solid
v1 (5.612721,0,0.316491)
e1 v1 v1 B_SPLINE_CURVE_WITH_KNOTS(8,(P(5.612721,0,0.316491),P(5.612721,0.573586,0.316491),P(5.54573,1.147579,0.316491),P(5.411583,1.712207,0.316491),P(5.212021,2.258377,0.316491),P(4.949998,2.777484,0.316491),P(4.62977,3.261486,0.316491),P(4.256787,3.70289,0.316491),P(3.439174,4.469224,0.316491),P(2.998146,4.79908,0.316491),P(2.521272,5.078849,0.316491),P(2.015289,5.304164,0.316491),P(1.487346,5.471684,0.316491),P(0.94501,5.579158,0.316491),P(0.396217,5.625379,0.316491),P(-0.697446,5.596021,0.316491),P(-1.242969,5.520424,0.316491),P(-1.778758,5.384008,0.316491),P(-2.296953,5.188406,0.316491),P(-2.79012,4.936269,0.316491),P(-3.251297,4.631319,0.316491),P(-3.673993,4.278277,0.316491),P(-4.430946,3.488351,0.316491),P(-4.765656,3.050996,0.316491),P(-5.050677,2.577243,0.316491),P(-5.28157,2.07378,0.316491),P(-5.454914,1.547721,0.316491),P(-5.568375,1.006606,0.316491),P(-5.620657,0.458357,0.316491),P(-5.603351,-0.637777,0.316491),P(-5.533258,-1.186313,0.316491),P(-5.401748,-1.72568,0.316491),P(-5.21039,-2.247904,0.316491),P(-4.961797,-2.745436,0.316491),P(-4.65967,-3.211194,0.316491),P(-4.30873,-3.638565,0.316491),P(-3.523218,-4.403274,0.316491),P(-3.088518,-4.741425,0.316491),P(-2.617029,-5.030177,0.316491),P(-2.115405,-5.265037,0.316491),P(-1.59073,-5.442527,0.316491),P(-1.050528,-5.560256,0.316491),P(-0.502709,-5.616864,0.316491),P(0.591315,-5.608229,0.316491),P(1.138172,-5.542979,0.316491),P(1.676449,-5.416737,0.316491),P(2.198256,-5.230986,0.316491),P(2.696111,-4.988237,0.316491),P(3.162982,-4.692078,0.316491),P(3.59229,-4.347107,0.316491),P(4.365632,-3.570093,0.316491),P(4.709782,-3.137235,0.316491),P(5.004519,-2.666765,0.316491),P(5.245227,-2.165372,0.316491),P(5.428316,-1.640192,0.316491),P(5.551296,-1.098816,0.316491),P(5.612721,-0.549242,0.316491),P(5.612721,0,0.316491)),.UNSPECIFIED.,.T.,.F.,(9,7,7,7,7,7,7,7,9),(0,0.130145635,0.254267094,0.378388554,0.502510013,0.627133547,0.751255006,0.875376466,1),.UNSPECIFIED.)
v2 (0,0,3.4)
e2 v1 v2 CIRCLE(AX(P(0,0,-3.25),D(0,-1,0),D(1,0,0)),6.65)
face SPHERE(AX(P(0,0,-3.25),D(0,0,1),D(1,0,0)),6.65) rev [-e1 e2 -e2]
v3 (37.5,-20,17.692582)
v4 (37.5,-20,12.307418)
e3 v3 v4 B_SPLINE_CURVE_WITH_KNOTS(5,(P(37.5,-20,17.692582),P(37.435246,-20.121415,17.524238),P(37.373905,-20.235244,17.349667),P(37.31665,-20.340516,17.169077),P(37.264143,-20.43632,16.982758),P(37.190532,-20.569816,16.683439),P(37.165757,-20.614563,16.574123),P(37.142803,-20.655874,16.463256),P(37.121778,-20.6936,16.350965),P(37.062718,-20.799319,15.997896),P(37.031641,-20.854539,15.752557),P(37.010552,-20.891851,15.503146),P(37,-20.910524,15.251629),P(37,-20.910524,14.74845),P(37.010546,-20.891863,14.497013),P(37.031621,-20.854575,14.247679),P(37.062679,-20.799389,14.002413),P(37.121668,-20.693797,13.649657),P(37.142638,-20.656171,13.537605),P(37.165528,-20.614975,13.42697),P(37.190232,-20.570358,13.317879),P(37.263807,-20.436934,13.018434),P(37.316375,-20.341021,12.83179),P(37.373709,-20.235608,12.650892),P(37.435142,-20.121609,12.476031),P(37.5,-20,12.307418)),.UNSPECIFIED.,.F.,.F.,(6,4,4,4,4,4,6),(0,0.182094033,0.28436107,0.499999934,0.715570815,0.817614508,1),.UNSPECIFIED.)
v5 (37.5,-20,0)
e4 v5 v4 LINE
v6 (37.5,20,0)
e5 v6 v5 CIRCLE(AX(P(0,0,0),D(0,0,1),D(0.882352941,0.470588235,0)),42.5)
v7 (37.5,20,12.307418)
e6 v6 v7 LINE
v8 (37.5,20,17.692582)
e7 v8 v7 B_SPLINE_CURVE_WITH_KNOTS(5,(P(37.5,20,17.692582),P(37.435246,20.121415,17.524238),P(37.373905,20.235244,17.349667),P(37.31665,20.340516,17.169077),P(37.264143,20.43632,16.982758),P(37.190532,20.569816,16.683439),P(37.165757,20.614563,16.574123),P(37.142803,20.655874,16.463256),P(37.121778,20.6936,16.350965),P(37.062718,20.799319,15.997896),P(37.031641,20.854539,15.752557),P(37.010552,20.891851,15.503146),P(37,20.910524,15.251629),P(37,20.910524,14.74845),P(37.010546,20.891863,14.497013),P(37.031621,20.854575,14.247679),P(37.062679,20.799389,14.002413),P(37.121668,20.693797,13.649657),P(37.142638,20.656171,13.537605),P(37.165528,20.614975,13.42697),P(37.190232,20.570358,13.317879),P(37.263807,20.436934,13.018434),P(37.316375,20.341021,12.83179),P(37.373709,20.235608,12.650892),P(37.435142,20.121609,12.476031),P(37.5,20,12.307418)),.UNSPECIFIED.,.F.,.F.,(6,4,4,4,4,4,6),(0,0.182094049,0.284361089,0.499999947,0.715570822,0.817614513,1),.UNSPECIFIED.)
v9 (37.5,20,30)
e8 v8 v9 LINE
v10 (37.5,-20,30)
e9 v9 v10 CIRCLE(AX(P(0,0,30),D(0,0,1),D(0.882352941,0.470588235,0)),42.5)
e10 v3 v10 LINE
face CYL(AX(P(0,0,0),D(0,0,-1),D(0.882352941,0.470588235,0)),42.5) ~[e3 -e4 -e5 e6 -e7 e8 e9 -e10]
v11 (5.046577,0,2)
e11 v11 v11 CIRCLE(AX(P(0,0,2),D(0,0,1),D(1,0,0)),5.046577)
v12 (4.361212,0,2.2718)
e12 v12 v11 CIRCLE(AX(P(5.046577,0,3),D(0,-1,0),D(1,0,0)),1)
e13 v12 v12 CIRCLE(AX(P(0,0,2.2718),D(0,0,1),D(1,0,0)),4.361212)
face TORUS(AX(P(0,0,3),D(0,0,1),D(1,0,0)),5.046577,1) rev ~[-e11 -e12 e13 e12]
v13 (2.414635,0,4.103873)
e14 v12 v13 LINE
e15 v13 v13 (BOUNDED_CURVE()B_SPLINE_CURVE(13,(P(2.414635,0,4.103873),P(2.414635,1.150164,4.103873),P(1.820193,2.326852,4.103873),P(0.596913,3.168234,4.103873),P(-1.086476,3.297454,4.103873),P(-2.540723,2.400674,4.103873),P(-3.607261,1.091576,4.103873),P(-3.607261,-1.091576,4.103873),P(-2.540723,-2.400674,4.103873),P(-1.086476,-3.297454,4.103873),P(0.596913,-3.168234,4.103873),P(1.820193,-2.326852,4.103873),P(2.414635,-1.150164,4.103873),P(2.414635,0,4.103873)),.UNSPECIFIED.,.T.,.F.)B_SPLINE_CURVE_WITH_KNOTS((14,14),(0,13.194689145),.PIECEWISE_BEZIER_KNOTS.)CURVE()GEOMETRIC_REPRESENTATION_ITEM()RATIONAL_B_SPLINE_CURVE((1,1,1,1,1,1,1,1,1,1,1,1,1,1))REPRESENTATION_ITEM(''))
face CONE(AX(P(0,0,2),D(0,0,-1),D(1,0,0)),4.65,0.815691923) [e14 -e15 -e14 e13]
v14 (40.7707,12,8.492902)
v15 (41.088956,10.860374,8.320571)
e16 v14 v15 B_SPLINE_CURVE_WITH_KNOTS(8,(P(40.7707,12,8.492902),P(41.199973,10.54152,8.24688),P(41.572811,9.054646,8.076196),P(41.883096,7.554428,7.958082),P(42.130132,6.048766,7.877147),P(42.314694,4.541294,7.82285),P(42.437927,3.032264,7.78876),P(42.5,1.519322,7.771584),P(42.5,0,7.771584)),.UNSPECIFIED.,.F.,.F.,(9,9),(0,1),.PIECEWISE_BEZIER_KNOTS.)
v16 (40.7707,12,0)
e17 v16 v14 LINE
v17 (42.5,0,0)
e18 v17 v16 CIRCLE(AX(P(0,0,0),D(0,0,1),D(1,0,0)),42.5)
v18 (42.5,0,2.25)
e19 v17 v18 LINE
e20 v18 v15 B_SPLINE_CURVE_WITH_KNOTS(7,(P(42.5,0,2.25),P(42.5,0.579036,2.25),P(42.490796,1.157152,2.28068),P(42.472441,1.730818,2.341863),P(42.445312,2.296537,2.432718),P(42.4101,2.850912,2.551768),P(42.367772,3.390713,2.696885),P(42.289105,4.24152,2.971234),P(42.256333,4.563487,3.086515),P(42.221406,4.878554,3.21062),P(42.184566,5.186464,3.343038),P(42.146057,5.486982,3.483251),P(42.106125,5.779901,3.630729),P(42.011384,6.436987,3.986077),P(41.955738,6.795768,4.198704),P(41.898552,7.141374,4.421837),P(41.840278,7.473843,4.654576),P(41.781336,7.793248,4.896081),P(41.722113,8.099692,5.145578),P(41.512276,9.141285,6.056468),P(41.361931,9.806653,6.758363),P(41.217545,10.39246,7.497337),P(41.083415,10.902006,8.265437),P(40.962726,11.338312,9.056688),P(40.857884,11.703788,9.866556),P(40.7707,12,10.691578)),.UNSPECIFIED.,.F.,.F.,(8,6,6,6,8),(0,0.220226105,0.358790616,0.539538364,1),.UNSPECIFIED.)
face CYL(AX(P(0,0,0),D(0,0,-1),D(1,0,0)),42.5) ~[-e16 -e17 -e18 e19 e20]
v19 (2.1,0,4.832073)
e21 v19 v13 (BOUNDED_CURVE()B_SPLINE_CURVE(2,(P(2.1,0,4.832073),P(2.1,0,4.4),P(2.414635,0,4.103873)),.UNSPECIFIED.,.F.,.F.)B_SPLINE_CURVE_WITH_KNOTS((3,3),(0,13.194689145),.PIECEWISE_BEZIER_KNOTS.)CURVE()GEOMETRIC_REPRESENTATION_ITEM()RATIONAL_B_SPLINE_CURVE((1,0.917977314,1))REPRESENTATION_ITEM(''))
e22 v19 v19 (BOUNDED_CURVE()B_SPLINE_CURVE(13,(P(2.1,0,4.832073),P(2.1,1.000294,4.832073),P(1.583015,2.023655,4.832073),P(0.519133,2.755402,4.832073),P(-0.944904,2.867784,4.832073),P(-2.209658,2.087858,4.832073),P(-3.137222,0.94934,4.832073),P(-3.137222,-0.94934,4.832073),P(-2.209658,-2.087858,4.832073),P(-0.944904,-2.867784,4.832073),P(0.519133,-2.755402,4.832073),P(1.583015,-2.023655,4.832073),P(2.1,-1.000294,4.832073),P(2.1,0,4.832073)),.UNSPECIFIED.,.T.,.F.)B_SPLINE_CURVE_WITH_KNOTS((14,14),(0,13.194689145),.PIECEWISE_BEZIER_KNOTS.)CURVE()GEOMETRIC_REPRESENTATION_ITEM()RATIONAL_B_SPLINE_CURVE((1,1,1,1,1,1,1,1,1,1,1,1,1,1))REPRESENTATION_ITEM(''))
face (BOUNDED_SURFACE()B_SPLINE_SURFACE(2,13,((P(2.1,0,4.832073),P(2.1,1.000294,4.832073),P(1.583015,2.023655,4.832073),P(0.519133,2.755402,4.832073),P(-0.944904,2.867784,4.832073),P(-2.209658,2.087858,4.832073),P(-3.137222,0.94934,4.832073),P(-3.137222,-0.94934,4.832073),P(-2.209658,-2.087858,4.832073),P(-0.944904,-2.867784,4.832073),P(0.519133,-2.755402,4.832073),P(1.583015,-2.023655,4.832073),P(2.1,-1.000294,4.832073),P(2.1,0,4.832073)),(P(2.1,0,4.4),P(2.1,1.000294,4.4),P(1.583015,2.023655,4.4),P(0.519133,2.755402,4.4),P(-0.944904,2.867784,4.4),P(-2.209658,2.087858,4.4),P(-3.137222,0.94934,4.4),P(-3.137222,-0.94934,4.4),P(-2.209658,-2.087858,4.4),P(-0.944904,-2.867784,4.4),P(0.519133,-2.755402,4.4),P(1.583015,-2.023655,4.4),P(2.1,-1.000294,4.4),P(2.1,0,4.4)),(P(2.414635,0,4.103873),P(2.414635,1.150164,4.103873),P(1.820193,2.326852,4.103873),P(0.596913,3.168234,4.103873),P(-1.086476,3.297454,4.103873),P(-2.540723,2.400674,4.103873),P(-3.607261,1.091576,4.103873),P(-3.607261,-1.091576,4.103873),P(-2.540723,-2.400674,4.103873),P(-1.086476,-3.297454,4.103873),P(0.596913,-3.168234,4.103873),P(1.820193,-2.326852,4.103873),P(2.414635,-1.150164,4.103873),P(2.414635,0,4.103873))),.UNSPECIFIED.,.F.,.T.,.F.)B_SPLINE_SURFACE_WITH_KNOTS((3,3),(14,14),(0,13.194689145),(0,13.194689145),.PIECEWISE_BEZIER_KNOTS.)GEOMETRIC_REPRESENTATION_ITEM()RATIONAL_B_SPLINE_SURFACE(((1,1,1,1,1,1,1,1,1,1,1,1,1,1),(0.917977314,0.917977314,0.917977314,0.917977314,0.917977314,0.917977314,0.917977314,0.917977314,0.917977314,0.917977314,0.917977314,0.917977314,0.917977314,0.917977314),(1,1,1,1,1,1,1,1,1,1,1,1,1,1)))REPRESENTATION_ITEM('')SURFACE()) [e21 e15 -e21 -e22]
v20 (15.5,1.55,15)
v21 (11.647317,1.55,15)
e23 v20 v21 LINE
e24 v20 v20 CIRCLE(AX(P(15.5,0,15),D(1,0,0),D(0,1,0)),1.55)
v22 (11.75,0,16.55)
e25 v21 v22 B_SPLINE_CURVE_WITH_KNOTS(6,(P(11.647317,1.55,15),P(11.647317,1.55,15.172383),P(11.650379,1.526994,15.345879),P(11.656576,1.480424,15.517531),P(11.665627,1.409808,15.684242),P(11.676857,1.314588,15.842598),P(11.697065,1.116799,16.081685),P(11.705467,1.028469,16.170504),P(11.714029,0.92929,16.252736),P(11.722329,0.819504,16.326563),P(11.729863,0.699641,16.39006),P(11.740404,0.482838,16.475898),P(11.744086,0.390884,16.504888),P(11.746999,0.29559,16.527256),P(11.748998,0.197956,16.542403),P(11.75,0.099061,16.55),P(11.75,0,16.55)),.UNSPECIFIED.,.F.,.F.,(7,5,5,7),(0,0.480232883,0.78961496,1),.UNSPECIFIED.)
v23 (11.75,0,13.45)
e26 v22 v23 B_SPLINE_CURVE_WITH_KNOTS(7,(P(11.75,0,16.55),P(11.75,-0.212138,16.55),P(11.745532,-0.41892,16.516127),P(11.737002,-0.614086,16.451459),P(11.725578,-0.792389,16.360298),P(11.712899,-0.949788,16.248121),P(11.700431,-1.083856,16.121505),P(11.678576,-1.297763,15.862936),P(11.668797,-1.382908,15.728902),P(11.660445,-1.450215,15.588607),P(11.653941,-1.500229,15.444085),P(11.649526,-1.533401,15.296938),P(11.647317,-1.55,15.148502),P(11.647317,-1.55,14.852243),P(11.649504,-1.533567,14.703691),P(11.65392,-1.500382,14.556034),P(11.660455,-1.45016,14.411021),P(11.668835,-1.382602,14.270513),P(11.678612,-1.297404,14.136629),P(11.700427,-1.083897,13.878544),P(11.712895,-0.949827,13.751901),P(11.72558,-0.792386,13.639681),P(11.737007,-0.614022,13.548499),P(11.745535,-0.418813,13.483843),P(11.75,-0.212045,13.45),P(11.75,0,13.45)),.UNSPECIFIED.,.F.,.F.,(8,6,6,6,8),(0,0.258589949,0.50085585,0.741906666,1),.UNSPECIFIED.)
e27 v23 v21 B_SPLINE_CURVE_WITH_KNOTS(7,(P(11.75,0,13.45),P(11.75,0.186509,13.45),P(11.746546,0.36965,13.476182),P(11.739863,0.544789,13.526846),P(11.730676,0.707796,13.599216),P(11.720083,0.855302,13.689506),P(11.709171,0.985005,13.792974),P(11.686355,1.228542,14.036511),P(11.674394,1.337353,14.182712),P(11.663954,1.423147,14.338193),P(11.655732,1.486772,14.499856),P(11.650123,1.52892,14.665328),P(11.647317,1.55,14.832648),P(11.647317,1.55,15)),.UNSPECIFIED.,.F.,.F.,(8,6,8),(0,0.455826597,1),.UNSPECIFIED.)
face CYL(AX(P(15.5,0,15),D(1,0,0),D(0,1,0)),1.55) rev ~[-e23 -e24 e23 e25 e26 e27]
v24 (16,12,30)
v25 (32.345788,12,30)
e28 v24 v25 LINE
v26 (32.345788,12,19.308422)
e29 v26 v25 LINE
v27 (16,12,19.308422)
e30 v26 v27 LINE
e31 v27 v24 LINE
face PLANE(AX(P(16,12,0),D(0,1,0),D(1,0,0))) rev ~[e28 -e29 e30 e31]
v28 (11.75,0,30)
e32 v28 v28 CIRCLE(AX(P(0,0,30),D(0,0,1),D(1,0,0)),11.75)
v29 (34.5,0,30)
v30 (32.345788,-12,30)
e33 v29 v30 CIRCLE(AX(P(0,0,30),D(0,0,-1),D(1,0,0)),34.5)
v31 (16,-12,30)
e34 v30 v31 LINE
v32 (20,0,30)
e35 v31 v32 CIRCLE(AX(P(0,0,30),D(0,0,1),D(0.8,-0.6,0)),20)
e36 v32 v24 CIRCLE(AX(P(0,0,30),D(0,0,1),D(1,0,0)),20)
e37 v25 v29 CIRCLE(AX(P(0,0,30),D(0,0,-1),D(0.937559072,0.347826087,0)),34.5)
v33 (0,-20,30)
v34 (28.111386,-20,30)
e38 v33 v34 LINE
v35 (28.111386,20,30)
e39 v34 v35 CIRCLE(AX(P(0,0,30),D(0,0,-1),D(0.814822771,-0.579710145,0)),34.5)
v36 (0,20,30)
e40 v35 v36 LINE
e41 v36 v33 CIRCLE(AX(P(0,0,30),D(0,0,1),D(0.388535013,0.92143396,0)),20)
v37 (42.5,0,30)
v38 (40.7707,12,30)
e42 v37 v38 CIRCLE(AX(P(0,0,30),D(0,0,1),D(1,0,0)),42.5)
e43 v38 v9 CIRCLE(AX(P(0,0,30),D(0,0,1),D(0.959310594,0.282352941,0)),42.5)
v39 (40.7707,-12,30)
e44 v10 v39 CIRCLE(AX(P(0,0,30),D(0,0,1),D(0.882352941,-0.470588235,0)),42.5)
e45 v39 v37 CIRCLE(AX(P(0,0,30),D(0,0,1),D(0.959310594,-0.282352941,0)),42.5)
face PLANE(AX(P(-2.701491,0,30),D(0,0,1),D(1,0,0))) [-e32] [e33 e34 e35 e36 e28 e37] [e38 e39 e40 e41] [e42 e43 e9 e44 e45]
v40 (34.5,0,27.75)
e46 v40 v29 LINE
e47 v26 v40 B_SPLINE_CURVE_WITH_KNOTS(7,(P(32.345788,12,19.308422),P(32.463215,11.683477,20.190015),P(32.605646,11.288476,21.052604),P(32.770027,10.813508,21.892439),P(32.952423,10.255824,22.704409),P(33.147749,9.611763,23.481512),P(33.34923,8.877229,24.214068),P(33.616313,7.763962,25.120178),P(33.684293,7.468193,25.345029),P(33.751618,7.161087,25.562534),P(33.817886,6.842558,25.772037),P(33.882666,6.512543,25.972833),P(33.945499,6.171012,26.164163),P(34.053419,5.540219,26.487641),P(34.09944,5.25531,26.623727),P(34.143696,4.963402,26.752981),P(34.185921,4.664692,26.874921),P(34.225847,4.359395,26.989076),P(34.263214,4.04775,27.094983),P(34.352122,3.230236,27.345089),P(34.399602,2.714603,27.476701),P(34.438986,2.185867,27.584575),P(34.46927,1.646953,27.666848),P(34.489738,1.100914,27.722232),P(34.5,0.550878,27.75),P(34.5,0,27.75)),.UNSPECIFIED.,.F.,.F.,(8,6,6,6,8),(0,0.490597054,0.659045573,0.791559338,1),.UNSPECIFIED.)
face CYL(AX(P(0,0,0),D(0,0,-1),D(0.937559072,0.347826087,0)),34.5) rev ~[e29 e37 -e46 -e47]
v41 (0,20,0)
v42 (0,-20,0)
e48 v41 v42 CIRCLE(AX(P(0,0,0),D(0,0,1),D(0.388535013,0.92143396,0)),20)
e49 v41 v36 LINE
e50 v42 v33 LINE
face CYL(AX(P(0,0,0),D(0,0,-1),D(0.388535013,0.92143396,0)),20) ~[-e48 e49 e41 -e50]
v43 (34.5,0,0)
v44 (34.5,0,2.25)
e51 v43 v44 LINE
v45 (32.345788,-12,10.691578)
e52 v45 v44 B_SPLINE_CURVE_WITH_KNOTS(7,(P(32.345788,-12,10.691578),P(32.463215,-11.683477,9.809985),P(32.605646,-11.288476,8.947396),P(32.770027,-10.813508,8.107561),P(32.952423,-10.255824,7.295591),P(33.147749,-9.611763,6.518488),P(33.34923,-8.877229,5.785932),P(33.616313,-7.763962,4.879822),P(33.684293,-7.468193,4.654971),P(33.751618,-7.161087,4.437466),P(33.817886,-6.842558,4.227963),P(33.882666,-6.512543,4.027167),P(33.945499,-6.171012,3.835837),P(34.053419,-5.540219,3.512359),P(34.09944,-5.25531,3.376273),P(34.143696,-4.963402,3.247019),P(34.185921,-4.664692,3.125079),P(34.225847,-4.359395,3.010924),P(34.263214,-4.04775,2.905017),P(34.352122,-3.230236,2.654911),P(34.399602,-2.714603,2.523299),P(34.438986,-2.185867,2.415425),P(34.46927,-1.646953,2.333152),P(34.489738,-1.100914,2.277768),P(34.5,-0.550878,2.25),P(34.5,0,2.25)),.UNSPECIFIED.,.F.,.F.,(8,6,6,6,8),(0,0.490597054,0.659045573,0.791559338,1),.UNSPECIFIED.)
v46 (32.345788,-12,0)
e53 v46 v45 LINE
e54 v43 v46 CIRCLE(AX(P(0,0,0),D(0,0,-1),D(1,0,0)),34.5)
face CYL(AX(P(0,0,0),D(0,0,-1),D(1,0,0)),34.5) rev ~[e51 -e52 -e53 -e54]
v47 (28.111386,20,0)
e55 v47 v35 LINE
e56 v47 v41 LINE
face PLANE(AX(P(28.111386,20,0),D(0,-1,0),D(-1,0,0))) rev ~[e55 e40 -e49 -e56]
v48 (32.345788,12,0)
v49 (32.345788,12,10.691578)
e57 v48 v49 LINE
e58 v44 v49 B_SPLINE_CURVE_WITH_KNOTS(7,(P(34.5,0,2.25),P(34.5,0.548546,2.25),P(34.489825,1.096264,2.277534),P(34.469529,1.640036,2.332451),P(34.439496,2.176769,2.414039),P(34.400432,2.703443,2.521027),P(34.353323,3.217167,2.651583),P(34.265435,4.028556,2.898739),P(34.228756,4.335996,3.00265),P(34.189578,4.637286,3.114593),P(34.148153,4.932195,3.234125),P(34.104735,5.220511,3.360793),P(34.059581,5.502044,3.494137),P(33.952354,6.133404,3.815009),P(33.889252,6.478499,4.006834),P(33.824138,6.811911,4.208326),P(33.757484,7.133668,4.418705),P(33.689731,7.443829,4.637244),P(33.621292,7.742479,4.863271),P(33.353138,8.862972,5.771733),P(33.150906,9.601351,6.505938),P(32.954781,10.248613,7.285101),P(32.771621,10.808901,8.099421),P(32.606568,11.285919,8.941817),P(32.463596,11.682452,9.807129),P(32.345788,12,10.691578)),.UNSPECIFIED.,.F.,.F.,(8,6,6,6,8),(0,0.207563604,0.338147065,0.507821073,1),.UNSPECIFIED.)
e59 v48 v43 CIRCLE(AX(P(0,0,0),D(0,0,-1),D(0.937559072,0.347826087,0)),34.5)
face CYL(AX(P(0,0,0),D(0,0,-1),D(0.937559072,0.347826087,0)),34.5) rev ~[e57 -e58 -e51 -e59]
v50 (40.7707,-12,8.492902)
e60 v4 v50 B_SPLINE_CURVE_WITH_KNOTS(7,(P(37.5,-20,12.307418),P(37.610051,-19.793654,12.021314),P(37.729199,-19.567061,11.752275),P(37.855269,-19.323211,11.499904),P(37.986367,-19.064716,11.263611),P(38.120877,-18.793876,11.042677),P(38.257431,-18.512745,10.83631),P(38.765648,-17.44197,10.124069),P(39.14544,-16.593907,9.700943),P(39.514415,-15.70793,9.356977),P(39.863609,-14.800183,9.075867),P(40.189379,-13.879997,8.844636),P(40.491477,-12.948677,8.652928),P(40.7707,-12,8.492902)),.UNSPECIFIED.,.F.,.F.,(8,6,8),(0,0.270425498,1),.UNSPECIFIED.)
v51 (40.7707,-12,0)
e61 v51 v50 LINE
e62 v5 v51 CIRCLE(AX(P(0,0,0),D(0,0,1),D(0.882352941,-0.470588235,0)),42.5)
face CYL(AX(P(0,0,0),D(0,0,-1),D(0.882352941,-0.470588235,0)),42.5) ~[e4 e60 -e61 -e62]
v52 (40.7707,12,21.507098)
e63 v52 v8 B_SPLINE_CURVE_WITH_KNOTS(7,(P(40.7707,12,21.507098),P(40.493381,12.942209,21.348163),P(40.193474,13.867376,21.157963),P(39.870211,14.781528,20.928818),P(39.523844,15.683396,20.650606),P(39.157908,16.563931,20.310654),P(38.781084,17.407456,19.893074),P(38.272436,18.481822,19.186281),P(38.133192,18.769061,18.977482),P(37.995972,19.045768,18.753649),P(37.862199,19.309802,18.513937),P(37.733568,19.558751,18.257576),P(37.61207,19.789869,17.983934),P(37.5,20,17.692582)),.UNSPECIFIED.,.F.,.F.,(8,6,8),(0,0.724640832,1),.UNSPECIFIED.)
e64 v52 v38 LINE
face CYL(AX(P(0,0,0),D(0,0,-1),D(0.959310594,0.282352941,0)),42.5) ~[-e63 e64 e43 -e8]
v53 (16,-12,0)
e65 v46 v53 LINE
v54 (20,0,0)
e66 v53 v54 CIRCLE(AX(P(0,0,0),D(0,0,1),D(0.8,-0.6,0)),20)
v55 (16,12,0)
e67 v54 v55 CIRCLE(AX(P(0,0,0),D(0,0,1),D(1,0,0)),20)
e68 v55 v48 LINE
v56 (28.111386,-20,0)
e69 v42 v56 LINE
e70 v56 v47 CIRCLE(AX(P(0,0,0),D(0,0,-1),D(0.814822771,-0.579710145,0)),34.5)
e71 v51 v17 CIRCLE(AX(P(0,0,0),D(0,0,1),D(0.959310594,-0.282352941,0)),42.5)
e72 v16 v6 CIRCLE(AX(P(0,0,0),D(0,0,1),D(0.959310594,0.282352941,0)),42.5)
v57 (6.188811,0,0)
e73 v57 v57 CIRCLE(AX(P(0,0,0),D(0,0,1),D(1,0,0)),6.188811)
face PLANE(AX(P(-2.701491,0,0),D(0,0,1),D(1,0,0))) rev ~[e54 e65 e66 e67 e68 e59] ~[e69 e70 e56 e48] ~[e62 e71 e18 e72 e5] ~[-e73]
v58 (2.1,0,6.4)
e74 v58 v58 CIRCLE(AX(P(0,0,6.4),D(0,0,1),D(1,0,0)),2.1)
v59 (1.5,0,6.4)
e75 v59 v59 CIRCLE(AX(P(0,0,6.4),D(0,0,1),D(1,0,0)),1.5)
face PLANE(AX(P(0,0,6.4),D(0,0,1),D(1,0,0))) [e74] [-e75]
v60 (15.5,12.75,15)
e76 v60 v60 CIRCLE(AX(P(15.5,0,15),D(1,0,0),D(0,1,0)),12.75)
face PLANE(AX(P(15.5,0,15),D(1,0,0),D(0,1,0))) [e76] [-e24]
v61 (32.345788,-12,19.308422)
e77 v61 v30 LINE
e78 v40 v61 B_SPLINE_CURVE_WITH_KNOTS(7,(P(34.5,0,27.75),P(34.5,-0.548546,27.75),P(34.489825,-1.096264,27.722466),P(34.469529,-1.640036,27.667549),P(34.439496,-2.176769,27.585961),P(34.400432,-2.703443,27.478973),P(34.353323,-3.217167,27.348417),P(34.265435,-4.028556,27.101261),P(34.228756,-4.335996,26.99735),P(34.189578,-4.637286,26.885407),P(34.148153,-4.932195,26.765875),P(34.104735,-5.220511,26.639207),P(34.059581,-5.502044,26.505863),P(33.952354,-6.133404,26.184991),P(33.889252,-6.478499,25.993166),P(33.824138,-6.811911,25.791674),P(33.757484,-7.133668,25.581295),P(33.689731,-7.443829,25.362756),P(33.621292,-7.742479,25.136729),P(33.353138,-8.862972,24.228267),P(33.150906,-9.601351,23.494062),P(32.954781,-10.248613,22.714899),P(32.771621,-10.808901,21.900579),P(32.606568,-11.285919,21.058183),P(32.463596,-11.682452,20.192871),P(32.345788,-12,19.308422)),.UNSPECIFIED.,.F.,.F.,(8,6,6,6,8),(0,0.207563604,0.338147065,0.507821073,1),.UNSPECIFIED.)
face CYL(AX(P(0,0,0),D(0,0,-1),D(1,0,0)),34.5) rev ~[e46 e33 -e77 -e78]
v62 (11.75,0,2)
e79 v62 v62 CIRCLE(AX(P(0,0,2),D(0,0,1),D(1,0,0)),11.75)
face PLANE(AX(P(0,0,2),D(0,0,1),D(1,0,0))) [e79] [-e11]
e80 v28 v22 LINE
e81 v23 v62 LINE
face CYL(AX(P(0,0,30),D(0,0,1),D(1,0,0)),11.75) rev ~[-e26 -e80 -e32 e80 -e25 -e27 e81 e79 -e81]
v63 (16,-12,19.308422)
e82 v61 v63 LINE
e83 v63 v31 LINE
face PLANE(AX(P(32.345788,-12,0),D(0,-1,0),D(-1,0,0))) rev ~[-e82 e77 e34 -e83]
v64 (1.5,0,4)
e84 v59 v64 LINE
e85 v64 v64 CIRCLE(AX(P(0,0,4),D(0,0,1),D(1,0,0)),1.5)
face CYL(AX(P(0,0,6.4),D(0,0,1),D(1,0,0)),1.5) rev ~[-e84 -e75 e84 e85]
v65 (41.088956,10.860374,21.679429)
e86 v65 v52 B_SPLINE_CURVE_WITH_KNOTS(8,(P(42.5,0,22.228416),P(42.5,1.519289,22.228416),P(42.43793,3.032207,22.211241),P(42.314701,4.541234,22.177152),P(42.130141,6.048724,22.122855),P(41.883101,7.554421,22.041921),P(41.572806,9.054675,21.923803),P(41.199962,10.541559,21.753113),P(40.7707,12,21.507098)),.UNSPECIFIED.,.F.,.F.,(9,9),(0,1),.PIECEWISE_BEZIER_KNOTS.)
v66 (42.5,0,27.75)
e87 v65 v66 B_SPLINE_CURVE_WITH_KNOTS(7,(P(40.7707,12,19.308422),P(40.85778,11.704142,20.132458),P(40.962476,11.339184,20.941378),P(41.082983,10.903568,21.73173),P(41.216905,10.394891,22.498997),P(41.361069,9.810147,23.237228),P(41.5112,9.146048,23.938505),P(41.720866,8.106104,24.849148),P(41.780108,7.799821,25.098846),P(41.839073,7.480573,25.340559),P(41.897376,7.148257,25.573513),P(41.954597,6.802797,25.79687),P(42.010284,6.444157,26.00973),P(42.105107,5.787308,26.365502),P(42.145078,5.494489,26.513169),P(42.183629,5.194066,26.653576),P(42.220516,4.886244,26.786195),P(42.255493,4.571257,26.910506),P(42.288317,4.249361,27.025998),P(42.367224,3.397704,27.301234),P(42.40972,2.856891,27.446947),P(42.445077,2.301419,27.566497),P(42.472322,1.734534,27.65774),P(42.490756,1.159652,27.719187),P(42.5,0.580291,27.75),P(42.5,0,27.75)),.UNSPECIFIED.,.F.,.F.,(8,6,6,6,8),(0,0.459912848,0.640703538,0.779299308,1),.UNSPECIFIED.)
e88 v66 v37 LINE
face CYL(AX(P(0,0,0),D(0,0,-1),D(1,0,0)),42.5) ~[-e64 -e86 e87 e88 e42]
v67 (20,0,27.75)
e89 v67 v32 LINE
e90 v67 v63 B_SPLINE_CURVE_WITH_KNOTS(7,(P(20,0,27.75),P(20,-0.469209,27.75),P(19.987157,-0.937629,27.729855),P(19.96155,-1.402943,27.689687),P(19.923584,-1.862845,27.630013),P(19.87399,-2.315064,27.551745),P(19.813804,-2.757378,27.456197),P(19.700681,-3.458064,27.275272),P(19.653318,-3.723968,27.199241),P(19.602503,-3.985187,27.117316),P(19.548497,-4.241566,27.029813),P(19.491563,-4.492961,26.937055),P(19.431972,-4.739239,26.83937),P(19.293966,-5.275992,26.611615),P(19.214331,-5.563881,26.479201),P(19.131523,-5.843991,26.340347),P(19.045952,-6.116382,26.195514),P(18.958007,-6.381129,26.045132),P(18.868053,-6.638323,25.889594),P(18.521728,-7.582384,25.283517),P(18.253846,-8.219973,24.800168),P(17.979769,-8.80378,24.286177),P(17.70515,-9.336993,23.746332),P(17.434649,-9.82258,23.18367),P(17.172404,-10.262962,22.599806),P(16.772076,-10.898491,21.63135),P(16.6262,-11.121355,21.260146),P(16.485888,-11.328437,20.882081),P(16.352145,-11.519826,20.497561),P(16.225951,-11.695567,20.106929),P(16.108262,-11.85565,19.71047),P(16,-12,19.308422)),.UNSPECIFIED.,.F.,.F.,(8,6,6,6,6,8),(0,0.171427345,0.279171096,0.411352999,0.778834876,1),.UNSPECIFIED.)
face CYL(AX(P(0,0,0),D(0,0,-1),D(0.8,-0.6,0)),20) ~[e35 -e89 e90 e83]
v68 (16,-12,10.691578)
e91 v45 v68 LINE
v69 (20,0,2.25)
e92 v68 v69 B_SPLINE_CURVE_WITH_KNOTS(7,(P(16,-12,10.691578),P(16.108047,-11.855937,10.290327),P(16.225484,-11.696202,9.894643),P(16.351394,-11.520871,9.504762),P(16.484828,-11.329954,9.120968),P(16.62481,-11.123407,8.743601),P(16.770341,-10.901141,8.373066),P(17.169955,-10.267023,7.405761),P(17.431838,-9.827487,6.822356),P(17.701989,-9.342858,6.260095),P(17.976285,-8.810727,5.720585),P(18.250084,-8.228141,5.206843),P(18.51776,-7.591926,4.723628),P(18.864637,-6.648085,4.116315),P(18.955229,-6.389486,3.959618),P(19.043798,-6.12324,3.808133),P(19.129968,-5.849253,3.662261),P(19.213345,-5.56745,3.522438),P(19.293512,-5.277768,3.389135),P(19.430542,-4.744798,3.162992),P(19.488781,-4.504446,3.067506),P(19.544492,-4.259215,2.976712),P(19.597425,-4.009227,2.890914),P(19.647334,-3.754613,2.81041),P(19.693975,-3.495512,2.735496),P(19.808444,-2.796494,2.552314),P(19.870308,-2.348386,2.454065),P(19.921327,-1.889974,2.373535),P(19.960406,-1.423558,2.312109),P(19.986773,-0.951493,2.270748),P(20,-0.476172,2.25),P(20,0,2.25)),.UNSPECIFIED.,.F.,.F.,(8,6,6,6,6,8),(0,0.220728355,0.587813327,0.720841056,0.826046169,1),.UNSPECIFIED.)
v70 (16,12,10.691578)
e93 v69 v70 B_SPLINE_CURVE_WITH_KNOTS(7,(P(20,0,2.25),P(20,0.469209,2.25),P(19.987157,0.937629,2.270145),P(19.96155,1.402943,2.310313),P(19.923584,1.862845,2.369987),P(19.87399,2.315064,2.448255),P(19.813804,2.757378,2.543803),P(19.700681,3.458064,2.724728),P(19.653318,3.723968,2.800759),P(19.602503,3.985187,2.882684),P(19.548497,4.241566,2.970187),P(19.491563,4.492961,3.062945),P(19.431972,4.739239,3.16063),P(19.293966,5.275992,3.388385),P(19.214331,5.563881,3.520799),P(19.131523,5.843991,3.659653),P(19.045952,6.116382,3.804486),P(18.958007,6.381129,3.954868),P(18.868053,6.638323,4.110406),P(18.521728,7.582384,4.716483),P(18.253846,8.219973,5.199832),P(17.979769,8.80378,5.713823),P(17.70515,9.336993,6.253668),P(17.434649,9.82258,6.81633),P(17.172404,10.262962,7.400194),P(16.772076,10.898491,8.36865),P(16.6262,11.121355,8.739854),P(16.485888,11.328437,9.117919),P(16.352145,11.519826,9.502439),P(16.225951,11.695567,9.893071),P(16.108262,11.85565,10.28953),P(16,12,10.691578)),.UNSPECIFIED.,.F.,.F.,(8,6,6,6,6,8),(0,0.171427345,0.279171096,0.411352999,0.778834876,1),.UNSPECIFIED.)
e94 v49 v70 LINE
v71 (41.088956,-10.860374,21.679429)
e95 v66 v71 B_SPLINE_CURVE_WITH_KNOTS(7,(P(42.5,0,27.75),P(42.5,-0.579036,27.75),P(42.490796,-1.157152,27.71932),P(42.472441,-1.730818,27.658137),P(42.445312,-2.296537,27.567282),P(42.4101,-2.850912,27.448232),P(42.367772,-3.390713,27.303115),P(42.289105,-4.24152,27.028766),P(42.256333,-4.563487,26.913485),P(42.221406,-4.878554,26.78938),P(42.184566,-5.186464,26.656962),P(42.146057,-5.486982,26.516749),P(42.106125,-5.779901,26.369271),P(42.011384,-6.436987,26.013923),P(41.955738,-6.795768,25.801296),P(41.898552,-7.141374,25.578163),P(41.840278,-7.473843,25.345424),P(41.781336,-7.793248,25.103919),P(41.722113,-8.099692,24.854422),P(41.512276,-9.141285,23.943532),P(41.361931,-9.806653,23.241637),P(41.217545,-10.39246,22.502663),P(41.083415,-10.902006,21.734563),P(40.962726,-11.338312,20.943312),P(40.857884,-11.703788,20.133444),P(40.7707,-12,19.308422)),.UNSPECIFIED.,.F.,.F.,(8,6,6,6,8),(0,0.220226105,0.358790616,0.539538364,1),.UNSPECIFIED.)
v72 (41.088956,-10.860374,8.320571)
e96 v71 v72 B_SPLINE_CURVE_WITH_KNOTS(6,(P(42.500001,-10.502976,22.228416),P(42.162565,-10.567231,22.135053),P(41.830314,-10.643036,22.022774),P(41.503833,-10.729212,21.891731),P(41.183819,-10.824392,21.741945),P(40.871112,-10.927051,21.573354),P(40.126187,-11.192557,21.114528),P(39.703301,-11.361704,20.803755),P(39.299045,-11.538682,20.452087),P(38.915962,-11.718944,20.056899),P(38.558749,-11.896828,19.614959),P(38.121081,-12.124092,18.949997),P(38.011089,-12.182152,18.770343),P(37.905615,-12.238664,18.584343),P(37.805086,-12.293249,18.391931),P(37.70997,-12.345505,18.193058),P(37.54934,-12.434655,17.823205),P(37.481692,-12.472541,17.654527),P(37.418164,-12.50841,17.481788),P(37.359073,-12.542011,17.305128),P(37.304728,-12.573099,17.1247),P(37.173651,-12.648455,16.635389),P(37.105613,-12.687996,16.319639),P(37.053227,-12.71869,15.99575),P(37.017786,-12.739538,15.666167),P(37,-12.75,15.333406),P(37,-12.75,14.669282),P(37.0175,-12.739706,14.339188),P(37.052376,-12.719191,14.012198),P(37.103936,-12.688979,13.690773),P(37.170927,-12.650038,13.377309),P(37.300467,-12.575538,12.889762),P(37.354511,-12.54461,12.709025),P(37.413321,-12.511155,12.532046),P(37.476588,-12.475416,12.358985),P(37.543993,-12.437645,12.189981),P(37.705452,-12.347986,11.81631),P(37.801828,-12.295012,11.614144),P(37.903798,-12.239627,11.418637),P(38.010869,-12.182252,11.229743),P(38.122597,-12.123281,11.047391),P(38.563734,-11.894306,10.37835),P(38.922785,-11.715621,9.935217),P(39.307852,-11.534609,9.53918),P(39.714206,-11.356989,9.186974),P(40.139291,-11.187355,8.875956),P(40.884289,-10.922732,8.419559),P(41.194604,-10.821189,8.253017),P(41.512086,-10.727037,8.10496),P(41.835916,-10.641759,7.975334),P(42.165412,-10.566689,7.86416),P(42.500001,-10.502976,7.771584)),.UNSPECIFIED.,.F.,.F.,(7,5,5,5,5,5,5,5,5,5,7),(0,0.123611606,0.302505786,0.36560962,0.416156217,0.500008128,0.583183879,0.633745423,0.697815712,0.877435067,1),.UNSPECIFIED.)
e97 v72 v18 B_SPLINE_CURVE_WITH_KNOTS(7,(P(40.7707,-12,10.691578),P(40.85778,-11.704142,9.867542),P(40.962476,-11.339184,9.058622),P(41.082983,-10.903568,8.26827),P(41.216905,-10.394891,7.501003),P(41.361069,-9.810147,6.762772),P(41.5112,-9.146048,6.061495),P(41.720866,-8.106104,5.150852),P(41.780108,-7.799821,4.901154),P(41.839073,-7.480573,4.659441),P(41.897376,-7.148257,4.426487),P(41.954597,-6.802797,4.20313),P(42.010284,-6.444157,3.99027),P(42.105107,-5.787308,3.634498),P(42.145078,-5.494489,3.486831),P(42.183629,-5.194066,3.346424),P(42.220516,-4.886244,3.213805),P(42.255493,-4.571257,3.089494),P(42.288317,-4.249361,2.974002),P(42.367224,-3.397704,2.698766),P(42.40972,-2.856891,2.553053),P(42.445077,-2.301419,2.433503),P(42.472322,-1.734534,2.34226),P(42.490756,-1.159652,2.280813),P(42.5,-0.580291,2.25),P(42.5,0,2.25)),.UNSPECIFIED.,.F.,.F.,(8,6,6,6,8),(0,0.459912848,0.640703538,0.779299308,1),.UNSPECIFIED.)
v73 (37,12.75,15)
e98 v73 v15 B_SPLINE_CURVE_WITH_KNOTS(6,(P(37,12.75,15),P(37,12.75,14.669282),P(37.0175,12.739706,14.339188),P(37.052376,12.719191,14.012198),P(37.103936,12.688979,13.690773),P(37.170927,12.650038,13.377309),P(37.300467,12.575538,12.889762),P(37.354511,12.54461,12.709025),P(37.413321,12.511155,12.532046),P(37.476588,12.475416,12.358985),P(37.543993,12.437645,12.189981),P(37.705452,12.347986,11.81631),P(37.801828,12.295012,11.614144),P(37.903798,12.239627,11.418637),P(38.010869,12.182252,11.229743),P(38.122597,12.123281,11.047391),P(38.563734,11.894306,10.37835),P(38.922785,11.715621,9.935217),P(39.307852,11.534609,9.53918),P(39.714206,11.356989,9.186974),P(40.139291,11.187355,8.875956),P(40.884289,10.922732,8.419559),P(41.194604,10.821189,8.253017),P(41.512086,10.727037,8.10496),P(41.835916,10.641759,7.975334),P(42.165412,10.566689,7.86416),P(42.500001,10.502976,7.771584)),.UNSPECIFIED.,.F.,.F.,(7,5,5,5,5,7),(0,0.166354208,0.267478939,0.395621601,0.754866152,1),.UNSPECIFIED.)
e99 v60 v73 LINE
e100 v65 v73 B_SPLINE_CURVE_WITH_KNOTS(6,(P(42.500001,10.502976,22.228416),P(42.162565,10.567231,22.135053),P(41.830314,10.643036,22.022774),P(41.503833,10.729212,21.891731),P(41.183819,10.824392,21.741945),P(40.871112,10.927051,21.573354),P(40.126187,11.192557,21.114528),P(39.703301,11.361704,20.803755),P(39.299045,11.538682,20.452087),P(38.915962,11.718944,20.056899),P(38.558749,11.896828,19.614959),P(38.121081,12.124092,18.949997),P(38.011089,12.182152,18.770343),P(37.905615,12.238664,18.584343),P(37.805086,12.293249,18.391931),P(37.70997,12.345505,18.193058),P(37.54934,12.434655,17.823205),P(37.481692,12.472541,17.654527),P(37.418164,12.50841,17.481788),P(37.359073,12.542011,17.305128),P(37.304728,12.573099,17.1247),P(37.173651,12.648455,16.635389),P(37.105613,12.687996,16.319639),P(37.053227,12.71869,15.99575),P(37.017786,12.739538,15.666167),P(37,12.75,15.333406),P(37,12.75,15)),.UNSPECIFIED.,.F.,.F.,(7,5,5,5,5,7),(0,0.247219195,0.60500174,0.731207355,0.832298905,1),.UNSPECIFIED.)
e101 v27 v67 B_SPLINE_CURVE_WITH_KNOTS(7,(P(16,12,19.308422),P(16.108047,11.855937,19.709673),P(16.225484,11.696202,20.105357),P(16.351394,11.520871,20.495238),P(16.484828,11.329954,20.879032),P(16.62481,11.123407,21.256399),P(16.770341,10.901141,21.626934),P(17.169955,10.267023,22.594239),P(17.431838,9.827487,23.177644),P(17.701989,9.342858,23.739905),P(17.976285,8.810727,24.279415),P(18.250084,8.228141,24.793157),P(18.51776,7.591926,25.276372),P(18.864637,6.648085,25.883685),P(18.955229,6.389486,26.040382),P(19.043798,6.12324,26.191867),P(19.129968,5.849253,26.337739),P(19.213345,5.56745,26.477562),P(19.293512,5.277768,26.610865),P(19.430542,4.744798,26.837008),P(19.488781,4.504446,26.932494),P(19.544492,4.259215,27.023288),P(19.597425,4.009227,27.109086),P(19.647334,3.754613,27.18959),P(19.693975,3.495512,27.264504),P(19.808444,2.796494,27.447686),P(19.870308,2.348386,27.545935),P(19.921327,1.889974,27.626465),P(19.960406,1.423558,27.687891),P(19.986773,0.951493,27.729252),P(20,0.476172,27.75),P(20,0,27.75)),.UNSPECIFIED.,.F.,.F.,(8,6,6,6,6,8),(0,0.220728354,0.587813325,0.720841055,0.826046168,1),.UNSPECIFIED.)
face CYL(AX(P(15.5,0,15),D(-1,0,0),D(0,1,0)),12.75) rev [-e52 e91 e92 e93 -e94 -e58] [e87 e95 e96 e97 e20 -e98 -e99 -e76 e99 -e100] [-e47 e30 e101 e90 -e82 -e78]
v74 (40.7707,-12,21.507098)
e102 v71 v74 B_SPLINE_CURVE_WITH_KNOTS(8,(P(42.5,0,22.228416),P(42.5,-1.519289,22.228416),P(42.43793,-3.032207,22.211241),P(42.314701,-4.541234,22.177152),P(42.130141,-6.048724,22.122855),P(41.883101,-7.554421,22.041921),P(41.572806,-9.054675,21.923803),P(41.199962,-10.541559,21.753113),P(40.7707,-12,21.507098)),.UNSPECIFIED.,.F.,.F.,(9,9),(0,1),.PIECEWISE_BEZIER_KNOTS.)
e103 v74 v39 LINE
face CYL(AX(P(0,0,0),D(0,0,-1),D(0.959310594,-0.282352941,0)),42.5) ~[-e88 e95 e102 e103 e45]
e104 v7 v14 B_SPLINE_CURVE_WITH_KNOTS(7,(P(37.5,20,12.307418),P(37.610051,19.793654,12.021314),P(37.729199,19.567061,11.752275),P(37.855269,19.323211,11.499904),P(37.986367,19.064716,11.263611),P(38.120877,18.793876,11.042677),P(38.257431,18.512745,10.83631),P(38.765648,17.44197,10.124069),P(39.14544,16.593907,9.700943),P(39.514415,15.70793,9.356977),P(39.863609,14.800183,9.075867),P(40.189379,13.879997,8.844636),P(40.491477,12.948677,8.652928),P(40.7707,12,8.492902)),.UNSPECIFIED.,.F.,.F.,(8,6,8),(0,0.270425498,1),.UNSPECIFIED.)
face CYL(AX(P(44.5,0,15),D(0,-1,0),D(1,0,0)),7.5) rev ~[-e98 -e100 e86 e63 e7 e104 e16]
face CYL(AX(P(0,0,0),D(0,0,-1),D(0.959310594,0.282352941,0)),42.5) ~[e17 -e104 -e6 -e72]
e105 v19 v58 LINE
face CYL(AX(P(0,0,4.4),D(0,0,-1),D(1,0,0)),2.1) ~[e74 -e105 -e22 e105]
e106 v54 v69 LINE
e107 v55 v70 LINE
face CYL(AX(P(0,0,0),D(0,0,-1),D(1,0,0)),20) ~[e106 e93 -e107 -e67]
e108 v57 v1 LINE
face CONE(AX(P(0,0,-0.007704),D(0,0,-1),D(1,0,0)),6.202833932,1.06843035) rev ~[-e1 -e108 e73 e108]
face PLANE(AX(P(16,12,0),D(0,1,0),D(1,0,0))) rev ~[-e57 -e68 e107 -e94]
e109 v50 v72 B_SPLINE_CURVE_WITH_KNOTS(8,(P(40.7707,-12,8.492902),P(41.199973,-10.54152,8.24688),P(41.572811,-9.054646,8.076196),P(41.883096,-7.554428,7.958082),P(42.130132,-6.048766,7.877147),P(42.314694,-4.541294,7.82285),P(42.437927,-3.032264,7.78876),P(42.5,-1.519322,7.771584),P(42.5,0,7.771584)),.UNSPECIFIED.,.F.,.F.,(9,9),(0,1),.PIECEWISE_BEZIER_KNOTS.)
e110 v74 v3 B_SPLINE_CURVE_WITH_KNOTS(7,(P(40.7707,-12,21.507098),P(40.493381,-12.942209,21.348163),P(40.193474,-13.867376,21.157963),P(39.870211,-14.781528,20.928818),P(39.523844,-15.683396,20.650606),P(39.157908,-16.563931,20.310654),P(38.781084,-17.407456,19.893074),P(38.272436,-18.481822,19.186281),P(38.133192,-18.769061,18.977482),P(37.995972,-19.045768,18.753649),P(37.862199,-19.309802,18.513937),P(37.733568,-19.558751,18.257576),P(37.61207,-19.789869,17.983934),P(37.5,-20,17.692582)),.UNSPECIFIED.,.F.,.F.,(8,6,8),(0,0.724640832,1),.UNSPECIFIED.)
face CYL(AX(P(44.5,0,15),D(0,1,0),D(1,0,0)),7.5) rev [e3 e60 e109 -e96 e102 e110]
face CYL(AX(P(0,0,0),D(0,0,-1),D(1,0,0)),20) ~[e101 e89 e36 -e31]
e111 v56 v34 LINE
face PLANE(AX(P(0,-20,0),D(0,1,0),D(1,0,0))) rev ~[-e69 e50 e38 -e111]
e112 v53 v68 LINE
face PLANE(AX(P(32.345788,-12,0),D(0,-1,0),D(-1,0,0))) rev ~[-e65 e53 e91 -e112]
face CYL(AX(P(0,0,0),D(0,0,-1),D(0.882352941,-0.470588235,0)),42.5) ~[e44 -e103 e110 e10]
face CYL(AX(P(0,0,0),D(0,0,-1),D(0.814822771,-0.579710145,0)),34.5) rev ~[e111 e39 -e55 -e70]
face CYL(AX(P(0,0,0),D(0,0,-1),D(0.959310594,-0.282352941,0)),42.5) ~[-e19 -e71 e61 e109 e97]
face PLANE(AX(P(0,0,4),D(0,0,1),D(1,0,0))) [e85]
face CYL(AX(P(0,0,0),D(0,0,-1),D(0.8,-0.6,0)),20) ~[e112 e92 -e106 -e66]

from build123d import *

# Parameters (mm, degrees)
F1_DEPTH      = 30
F3_START      = 15.5
F2_R          = 12.75
F3_DEPTH      = 30
F4_R          = 7.5
F5_DEPTH      = 25
F5_DEPTH_BACK = 25
F6_R          = 11.75
F7_DEPTH      = 28
F8_R          = 1.55
F9_DEPTH      = 10
F14_R         = 2.1
F15_DEPTH     = 2
F16_R         = 1.5
F17_DEPTH     = 2.4
F18_R         = 1


# Not quite as in the source:
# - a fillet or chamfer that OpenCascade refuses, or shapes differently, is made with other operations: its cross-section is extruded or revolved along the edge and cut away or added


with BuildPart() as f1:
    # F0 (on Top) → F1 (new body)
    with BuildSketch(Plane.XY):
        with BuildLine():
            Line((7.7707002638, -18.4286792096), (7.7707002638, 18.4286792096))
            ThreePointArc((7.7707002638, 18.4286792096), (3.963988888, 19.6032342254), (0, 20))
            ThreePointArc((0, 20), (-20, 0), (0, -20))
            ThreePointArc((0, -20), (3.963988888, -19.6032342254), (7.7707002638, -18.4286792096))
        make_face()
        with BuildLine():
            Line((7.7707002638, 18.4286792096), (7.7707002638, 20))
            Line((7.7707002638, 20), (0, 20))
            ThreePointArc((0, 20), (3.963988888, 19.6032342254), (7.7707002638, 18.4286792096))
        make_face()
        with BuildLine():
            Line((0, -20), (7.7707002638, -20))
            Line((7.7707002638, -20), (7.7707002638, -18.4286792096))
            ThreePointArc((7.7707002638, -18.4286792096), (3.963988888, -19.6032342254), (0, -20))
        make_face()
        with BuildLine():
            Line((15.7707002638, 12), (16, 12))
            ThreePointArc((16, 12), (12.3123323076, 15.7609159996), (7.7707002638, 18.4286792096))
            Line((7.7707002638, 18.4286792096), (7.7707002638, -18.4286792096))
            ThreePointArc((7.7707002638, -18.4286792096), (12.3123323076, -15.7609159996), (16, -12))
            Line((16, -12), (15.7707002638, -12))
            Line((15.7707002638, -12), (15.7707002638, 12))
        make_face()
        with BuildLine():
            ThreePointArc((28.1113855937, -20), (30.4920884675, -16.1394715183), (32.3457879793, -12))
            Line((32.3457879793, -12), (16, -12))
            ThreePointArc((16, -12), (12.3123323076, -15.7609159996), (7.7707002638, -18.4286792096))
            Line((7.7707002638, -18.4286792096), (7.7707002638, -20))
            Line((7.7707002638, -20), (28.1113855937, -20))
        make_face()
        with BuildLine():
            ThreePointArc((20, 0), (18.973665961, 6.3245553203), (16, 12))
            Line((16, 12), (15.7707002638, 12))
            Line((15.7707002638, 12), (15.7707002638, -12))
            Line((15.7707002638, -12), (16, -12))
            ThreePointArc((16, -12), (18.973665961, -6.3245553203), (20, 0))
        make_face()
        with BuildLine():
            Line((16, 12), (32.3457879793, 12))
            ThreePointArc((32.3457879793, 12), (30.4920884675, 16.1394715183), (28.1113855937, 20))
            Line((28.1113855937, 20), (7.7707002638, 20))
            Line((7.7707002638, 20), (7.7707002638, 18.4286792096))
            ThreePointArc((7.7707002638, 18.4286792096), (12.3123323076, 15.7609159996), (16, 12))
        make_face()
        with BuildLine():
            Line((32.3457879793, 12), (40.7707002638, 12))
            ThreePointArc((40.7707002638, 12), (39.3392377906, 16.0833569274), (37.5, 20))
            Line((37.5, 20), (28.1113855937, 20))
            ThreePointArc((28.1113855937, 20), (30.4920884675, 16.1394715183), (32.3457879793, 12))
        make_face()
        with BuildLine():
            Line((28.1113855937, 20), (37.5, 20))
            ThreePointArc((37.5, 20), (-42.5, 0), (37.5, -20))
            Line((37.5, -20), (28.1113855937, -20))
            ThreePointArc((28.1113855937, -20), (-34.5, 0), (28.1113855937, 20))
        make_face()
        with BuildLine():
            ThreePointArc((37.5, -20), (39.3392377906, -16.0833569274), (40.7707002638, -12))
            Line((40.7707002638, -12), (32.3457879793, -12))
            ThreePointArc((32.3457879793, -12), (30.4920884675, -16.1394715183), (28.1113855937, -20))
            Line((28.1113855937, -20), (37.5, -20))
        make_face()
        with BuildLine():
            Line((40.7707002638, -12), (40.7707002638, 12))
            Line((40.7707002638, 12), (32.3457879793, 12))
            ThreePointArc((32.3457879793, 12), (33.9571766, 6.0959131685), (34.5, 0))
            ThreePointArc((34.5, 0), (33.9571766, -6.0959131685), (32.3457879793, -12))
            Line((32.3457879793, -12), (40.7707002638, -12))
        make_face()
        with BuildLine():
            ThreePointArc((40.7707002638, -12), (42.0654535291, -6.0619814743), (42.5, 0))
            ThreePointArc((42.5, 0), (42.0654535291, 6.0619814743), (40.7707002638, 12))
            Line((40.7707002638, 12), (40.7707002638, -12))
        make_face()
    extrude(amount=F1_DEPTH)

    # F2 (on Right) → F3 (cut)
    with BuildSketch(Plane.YZ.offset(F3_START)):
        with Locations((0, 15)):
            Circle(F2_R)
    extrude(amount=F3_DEPTH, mode=Mode.SUBTRACT)

    # F4 (on Front) → F5 (cut, two sides)
    with BuildSketch(Plane.XZ) as f5_sk:
        with Locations((44.5, 15)):
            Circle(F4_R)
    extrude(amount=-F5_DEPTH, mode=Mode.SUBTRACT)
    extrude(f5_sk.sketch, amount=F5_DEPTH_BACK, mode=Mode.SUBTRACT)

    # F6 (on face) → F7 (cut)
    with BuildSketch(Plane.XY.offset(30)):
        Circle(F6_R)
    extrude(amount=-F7_DEPTH, mode=Mode.SUBTRACT)

    # F8 (on face) → F9 (cut)
    with BuildSketch(Plane.YZ.offset(15.5)):
        with Locations((0, 15)):
            Circle(F8_R)
    extrude(amount=-F9_DEPTH, mode=Mode.SUBTRACT)

    # F10 (on Front) → F11 (revolve)
    with BuildSketch(Plane.XZ):
        Polygon((0, 4.4), (0, 2), (4.65, 2), (2.1, 4.4), align=None)
    revolve(axis=Axis((0, 0, 6.6192487312), (0, 0, 1)))

    # F12 (on Front) → F13 (revolve, cut)
    with BuildSketch(Plane.XZ):
        with BuildLine():
            ThreePointArc((0, -9.9), (4.7022600949, -7.9522600949), (6.65, -3.25))
            ThreePointArc((6.65, -3.25), (4.7022600949, 1.4522600949), (0, 3.4))
            Line((0, 3.4), (0, -9.9))
        make_face()
    revolve(axis=Axis((0, 0, -3.25), (0, 0, -1)), mode=Mode.SUBTRACT)

    # F14 (on face) → F15 (join)
    with BuildSketch(Plane.XY.offset(4.4)):
        Circle(F14_R)
    extrude(amount=F15_DEPTH)

    # F16 (on face) → F17 (cut)
    with BuildSketch(Plane.XY.offset(6.4)):
        Circle(F16_R)
    extrude(amount=-F17_DEPTH, mode=Mode.SUBTRACT)

    # F18
    f18_edges = [f1.edges().sort_by_distance(p)[0] for p in [
        (-2.1, 0, 4.4),
        (-4.65, 0, 2),
    ]]
    fillet(f18_edges, radius=F18_R)

    # F19: chamfer of 0.4 on 1 edges, made by hand

    # F19_s1 → F19_t2 (revolve, cut)
    with BuildSketch(Plane.XZ):
        with BuildLine():
            Line((6.2028339317, -0.0077040086), (5.5986981628, 0.3241952337))
            Line((5.5986981628, 0.3241952337), (5.5919460169, 0.3199047179))
            ThreePointArc((5.5919460169, 0.3199047179), (5.6990064099, 0.1613765462), (5.7947443643, -0.0039097744))
            Line((5.7947443643, -0.0039097744), (5.8017238817, -0.008))
            ThreePointArc((5.8017238817, -0.008), (6.0022789067, -0.008), (6.2028339317, -0.0157040086))
            Line((6.2028339317, -0.0157040086), (6.2028339317, -0.0077040086))
        make_face()
    revolve(axis=Axis((0, 0, 0), (0, 0, 1)), mode=Mode.SUBTRACT)


solid = f1.part
